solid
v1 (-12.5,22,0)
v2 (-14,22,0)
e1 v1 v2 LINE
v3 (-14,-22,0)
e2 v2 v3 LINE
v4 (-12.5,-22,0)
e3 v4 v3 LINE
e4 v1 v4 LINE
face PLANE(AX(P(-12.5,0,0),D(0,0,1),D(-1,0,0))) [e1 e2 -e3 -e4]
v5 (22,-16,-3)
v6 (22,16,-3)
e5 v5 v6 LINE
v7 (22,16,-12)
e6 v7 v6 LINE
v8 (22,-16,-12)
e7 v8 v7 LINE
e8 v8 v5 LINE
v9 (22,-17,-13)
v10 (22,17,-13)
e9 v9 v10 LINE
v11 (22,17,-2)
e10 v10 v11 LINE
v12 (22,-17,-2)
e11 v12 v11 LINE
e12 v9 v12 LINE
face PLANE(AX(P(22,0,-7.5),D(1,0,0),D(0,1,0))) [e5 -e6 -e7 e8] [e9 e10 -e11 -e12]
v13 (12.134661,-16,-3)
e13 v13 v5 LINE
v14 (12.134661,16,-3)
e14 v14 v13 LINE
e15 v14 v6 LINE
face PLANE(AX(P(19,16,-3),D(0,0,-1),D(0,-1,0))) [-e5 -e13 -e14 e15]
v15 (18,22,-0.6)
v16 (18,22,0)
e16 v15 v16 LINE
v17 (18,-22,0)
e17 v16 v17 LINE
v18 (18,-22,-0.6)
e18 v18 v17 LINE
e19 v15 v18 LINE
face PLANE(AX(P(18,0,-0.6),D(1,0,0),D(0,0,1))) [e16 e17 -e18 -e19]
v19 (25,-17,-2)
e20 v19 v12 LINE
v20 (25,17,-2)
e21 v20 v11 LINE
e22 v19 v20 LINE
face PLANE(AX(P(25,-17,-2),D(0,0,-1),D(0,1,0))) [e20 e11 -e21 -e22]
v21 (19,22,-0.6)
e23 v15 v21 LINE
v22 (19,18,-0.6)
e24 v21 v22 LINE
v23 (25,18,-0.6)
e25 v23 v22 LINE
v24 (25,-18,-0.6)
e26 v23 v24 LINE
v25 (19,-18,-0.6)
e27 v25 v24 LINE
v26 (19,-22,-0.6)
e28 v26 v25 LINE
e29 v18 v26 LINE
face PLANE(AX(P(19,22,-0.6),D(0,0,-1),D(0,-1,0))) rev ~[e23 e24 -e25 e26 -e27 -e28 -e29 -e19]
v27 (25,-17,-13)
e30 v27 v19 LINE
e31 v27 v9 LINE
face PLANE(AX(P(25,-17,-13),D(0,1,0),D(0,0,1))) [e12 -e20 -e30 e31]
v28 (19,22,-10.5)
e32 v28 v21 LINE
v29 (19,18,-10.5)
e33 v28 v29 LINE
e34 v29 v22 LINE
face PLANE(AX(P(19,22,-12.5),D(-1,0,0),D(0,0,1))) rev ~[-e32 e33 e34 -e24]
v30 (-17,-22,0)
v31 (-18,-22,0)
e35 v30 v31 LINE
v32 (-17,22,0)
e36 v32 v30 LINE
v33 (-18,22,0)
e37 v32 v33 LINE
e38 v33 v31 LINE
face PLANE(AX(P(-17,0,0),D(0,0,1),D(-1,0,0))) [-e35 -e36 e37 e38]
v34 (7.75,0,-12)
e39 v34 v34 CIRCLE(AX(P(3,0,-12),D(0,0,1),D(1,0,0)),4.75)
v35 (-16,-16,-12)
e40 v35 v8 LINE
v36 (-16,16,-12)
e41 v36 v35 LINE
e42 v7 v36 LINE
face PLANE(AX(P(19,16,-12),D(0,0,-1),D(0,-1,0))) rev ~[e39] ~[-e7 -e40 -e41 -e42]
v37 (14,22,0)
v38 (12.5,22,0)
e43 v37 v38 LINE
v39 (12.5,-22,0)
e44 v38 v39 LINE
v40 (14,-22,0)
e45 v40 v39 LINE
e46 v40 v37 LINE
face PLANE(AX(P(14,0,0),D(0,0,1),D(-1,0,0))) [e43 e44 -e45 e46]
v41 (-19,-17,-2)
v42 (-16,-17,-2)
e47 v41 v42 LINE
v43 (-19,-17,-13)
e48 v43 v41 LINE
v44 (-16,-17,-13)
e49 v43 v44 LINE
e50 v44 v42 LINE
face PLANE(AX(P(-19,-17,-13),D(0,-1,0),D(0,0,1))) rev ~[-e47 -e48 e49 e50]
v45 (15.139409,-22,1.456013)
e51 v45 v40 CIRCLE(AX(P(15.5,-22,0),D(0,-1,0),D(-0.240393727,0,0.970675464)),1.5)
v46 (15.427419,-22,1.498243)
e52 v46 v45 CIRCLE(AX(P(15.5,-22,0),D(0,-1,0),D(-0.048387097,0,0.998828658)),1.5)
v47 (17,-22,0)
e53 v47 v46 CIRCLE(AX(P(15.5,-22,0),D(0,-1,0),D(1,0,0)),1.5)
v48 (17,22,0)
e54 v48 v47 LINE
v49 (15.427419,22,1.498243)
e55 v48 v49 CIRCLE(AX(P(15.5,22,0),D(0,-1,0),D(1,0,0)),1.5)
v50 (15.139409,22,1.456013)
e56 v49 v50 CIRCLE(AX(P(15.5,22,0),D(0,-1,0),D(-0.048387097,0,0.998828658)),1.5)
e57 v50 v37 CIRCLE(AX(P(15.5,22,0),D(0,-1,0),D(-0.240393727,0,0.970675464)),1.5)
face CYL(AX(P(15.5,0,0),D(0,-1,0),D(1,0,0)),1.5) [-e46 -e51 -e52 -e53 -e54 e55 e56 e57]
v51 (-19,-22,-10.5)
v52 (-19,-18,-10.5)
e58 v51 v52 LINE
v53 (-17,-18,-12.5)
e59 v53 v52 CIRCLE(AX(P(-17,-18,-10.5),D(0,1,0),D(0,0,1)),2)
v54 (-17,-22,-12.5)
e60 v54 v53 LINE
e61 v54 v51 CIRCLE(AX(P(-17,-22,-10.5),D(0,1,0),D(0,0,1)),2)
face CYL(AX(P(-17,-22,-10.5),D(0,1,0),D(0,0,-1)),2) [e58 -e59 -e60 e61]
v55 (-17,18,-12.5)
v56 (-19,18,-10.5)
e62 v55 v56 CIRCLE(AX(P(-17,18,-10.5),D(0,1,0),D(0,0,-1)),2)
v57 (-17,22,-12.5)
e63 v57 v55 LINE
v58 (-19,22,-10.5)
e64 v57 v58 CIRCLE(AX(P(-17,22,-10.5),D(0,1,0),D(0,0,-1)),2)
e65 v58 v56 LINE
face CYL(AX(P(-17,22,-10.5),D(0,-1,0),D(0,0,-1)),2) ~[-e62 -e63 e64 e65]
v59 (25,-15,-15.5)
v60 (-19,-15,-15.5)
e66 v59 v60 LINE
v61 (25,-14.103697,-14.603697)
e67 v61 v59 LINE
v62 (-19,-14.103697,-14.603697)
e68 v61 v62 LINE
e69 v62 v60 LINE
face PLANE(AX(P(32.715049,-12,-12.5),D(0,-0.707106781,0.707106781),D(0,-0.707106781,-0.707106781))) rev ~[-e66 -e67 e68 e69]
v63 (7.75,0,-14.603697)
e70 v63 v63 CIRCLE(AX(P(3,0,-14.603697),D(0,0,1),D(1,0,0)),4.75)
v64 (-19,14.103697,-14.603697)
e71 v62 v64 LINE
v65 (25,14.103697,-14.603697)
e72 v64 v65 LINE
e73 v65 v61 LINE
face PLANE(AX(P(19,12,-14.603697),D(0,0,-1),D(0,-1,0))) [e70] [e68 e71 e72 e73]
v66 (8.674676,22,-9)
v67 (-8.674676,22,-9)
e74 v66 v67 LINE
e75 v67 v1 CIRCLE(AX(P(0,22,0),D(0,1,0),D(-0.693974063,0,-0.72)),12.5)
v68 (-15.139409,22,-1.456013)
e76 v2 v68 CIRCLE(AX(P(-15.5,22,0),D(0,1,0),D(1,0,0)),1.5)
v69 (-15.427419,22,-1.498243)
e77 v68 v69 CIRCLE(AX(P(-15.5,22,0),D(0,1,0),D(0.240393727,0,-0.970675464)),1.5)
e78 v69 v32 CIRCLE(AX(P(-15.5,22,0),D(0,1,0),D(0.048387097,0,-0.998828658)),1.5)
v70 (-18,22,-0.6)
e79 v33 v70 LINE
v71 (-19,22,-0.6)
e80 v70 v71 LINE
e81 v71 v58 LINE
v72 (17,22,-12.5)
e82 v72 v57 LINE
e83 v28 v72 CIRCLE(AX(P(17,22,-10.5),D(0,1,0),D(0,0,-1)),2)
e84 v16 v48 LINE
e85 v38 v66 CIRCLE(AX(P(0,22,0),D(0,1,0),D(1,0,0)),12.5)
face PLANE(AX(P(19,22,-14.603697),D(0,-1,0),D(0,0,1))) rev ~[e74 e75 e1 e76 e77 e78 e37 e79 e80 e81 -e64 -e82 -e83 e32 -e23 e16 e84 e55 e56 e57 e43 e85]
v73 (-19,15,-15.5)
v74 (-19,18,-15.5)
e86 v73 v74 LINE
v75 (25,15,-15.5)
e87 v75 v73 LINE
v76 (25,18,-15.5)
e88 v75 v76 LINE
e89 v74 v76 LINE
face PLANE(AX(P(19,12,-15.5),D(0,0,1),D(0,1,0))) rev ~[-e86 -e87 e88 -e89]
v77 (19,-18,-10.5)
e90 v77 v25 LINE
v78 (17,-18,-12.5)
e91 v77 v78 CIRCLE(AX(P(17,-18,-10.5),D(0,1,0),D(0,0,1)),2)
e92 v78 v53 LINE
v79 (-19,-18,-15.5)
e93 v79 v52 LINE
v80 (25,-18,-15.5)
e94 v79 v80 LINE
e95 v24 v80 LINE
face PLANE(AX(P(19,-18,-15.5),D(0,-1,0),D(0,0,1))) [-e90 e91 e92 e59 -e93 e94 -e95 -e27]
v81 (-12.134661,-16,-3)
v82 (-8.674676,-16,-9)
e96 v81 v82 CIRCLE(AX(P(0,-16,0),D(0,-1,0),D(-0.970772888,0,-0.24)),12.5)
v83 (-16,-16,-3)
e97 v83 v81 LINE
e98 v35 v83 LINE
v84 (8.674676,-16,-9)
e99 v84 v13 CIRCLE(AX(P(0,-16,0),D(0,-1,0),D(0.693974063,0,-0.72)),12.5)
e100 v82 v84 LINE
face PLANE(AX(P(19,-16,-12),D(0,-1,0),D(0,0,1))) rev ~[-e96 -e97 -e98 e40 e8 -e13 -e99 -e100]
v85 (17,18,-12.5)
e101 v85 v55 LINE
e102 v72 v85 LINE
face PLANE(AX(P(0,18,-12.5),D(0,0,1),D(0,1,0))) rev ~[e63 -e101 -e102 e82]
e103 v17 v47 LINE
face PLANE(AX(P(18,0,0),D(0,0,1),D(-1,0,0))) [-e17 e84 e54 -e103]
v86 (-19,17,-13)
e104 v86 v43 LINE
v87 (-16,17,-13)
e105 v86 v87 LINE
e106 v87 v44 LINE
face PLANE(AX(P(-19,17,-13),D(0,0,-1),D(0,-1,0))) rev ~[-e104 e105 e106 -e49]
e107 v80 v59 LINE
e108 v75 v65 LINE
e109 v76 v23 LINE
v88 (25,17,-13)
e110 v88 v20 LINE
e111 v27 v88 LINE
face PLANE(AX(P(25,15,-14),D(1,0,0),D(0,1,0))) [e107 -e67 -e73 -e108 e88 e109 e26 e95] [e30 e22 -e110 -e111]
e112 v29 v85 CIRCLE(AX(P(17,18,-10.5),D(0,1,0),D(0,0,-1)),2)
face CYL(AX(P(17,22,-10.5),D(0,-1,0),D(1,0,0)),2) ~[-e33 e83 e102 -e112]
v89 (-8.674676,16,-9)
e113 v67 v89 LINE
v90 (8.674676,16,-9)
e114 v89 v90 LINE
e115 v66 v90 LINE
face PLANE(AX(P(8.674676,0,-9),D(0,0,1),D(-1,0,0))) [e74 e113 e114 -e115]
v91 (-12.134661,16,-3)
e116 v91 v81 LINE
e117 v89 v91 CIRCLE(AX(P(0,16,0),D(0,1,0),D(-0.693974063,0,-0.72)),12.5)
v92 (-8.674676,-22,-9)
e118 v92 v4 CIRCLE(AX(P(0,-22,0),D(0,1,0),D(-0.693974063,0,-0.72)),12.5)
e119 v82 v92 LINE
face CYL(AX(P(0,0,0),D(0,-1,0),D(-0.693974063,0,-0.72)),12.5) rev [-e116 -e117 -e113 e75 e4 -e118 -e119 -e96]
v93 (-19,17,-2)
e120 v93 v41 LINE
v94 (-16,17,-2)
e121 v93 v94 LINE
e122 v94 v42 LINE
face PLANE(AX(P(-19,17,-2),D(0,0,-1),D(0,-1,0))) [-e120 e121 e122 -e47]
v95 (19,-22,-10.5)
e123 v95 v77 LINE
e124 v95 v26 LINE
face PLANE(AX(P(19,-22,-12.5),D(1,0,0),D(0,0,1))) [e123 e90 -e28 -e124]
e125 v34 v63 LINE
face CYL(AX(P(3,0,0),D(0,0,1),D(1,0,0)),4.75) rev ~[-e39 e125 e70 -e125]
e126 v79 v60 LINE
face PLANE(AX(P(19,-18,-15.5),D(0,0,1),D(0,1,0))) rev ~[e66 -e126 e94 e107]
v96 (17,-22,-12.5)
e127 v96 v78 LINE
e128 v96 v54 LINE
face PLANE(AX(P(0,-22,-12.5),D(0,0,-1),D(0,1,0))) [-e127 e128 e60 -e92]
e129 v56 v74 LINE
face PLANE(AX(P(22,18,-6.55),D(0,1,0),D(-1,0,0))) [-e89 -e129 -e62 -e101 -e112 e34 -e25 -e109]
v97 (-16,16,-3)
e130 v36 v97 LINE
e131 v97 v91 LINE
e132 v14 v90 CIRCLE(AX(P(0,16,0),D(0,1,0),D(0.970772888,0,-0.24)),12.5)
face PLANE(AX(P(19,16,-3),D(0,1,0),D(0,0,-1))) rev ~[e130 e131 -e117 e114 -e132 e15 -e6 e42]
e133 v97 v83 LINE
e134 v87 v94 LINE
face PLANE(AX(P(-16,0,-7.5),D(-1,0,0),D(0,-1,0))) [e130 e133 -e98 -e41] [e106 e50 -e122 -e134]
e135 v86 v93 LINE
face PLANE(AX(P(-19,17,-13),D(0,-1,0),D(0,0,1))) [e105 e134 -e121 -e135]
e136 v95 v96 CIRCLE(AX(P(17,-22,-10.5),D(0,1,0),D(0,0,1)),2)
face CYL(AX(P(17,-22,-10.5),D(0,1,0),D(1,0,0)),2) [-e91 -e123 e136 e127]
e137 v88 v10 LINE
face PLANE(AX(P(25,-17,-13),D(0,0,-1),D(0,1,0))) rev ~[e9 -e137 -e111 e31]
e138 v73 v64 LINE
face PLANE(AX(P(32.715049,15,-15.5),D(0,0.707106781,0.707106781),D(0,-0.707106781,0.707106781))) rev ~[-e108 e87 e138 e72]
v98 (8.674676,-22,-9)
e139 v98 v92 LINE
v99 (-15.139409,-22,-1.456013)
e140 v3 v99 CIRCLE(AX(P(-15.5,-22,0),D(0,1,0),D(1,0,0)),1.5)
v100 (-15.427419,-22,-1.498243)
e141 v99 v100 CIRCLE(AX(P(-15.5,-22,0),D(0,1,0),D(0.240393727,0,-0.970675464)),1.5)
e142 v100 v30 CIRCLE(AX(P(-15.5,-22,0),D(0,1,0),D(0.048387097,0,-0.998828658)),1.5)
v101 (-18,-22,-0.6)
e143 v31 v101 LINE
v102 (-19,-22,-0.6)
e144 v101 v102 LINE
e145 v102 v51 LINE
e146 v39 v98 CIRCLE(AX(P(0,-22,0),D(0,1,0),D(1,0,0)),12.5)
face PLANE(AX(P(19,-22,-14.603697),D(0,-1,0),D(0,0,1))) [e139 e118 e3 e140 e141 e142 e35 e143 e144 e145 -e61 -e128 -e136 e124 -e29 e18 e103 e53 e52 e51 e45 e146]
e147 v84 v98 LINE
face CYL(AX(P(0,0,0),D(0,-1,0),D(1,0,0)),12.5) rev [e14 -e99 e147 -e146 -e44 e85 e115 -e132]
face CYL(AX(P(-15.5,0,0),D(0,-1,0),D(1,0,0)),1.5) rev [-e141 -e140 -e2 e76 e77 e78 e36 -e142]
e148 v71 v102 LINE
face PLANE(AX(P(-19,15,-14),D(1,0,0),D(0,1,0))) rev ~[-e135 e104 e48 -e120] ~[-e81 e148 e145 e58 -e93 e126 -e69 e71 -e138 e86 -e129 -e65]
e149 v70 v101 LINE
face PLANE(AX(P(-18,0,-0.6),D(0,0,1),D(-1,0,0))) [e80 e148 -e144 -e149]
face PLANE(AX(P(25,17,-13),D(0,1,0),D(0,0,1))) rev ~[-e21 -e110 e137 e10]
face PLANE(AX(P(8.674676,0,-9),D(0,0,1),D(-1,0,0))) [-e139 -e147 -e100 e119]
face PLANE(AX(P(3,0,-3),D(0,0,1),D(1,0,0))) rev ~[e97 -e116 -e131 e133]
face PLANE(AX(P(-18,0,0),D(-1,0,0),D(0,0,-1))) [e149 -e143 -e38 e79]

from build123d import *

# Parameters (mm, degrees)
F3_DEPTH     = 22
F0_R         = 4.75
F4_DEPTH     = 25
F2_W         = 6
F2_H         = 3
F5_DEPTH     = 19
F6_W         = 60
F6_H         = 32
F7_DEPTH     = 3
F8_DEPTH     = 3
F9_DEPTH     = 3
F10_DEPTH    = 3
F11_DEPTH    = 6
F12_W        = 34
F12_H        = 11
F12_W_2      = 32
F12_H_2      = 9
F13_DEPTH    = 3
F14_W        = 34
F14_H        = 11
F14_W_2      = 32
F14_H_2      = 9
F15_DEPTH    = 3
F2_W_2       = 4
F16_DEPTH    = 25
F17_T4_DEPTH = 59.4300979278
F17_T9_DEPTH = 59.4300979278
F18_W        = 6
F18_H        = 11.9
F19_DEPTH    = 4
F20_W        = 6
F20_H        = 11.9
F21_DEPTH    = 4
F22_R        = 2


# Not quite as in the source:
# - a fillet or chamfer that OpenCascade refuses, or shapes differently, is made with other operations: its cross-section is extruded or revolved along the edge and cut away or added


with BuildPart() as f3:
    # F1 (on Front) → F3 (new body, symmetric)
    with BuildSketch(Plane.XZ):
        with BuildLine():
            Line((14, 0), (12.5, 0))
            ThreePointArc((12.5, 0), (11.5039872942, -4.8896090165), (8.6746757864, -9))
            Line((8.6746757864, -9), (12.6194294641, -9))
            ThreePointArc((12.6194294641, -9), (14.1666094691, -6.2894495904), (15.139409409, -3.3238957184))
            Line((15.139409409, -3.3238957184), (15.139409409, -1.4560131956))
            ThreePointArc((15.139409409, -1.4560131956), (14.318711321, -0.9244225531), (14, 0))
        make_face()
        with BuildLine():
            Line((8.6746757864, -9), (3.0413812651, -9))
            ThreePointArc((3.0413812651, -9), (0, -9.5), (-3.0413812651, -9))
            Line((-3.0413812651, -9), (-8.6746757864, -9))
            ThreePointArc((-8.6746757864, -9), (0, -12.5), (8.6746757864, -9))
        make_face()
        with BuildLine():
            ThreePointArc((-3.0413812651, -9), (0, -9.5), (3.0413812651, -9))
            Line((3.0413812651, -9), (-3.0413812651, -9))
        make_face()
        with BuildLine():
            Line((12.6194294641, -9), (8.6746757864, -9))
            ThreePointArc((8.6746757864, -9), (0, -12.5), (-8.6746757864, -9))
            Line((-8.6746757864, -9), (-12.6194294641, -9))
            ThreePointArc((-12.6194294641, -9), (-10.9697184602, -10.9505834047), (-9.0220182155, -12.603697367))
            Line((-9.0220182155, -12.603697367), (9.0220182155, -12.603697367))
            ThreePointArc((9.0220182155, -12.603697367), (10.9697184602, -10.9505834047), (12.6194294641, -9))
        make_face()
        with BuildLine():
            ThreePointArc((15.139409409, 1.4560131956), (14.318711321, 0.9244225531), (14, 0))
            Line((14, 0), (15.139409409, 0))
            Line((15.139409409, 0), (15.139409409, 1.4560131956))
        make_face()
        with BuildLine():
            Line((15.139409409, 0), (14, 0))
            ThreePointArc((14, 0), (14.318711321, -0.9244225531), (15.139409409, -1.4560131956))
            Line((15.139409409, -1.4560131956), (15.139409409, 0))
        make_face()
        with BuildLine():
            ThreePointArc((-8.6746757864, -9), (-11.5039872942, -4.8896090165), (-12.5, 0))
            Line((-12.5, 0), (-14, 0))
            ThreePointArc((-14, 0), (-14.318711321, -0.9244225531), (-15.139409409, -1.4560131956))
            Line((-15.139409409, -1.4560131956), (-15.139409409, -3.3238957184))
            ThreePointArc((-15.139409409, -3.3238957184), (-14.1666094691, -6.2894495904), (-12.6194294641, -9))
            Line((-12.6194294641, -9), (-8.6746757864, -9))
        make_face()
        with BuildLine():
            ThreePointArc((15.139409409, -3.3238957184), (14.1666094691, -6.2894495904), (12.6194294641, -9))
            Line((12.6194294641, -9), (15.139409409, -9))
            Line((15.139409409, -9), (15.139409409, -3.3238957184))
        make_face()
        with BuildLine():
            Line((15.139409409, -9), (12.6194294641, -9))
            ThreePointArc((12.6194294641, -9), (10.9697184602, -10.9505834047), (9.0220182155, -12.603697367))
            Line((9.0220182155, -12.603697367), (14.2178343175, -12.603697367))
            ThreePointArc((14.2178343175, -12.603697367), (15.5800609184, -10.8748196205), (16.7332005307, -9))
            Line((16.7332005307, -9), (15.139409409, -9))
        make_face()
        with BuildLine():
            Line((15.5, 0), (15.139409409, 0))
            Line((15.139409409, 0), (15.139409409, -1.4560131956))
            ThreePointArc((15.139409409, -1.4560131956), (15.2823875721, -1.484131002), (15.4274193548, -1.4982429876))
            ThreePointArc((15.4274193548, -1.4982429876), (15.4818442054, -0.75), (15.5, 0))
        make_face()
        with BuildLine():
            Line((15.139409409, 1.4560131956), (15.139409409, 0))
            Line((15.139409409, 0), (15.5, 0))
            ThreePointArc((15.5, 0), (15.4818442054, 0.75), (15.4274193548, 1.4982429876))
            ThreePointArc((15.4274193548, 1.4982429876), (15.2823875721, 1.484131002), (15.139409409, 1.4560131956))
        make_face()
        with BuildLine():
            ThreePointArc((15.4274193548, -1.4982429876), (15.2823875721, -1.484131002), (15.139409409, -1.4560131956))
            Line((15.139409409, -1.4560131956), (15.139409409, -3.3238957184))
            ThreePointArc((15.139409409, -3.3238957184), (15.3106501215, -2.4153659883), (15.4274193548, -1.4982429876))
        make_face()
        with BuildLine():
            ThreePointArc((-9.0220182155, -12.603697367), (-10.9697184602, -10.9505834047), (-12.6194294641, -9))
            Line((-12.6194294641, -9), (-15.139409409, -9))
            Line((-15.139409409, -9), (-16.7332005307, -9))
            ThreePointArc((-16.7332005307, -9), (-15.5800609184, -10.8748196205), (-14.2178343175, -12.603697367))
            Line((-14.2178343175, -12.603697367), (-9.0220182155, -12.603697367))
        make_face()
        with BuildLine():
            Line((-15.139409409, -9), (-12.6194294641, -9))
            ThreePointArc((-12.6194294641, -9), (-14.1666094691, -6.2894495904), (-15.139409409, -3.3238957184))
            Line((-15.139409409, -3.3238957184), (-15.139409409, -9))
        make_face()
        with BuildLine():
            Line((15.139409409, -3.3238957184), (15.139409409, -9))
            Line((15.139409409, -9), (16.7332005307, -9))
            ThreePointArc((16.7332005307, -9), (18.3490087673, -4.9309103884), (18.9905239528, -0.6))
            Line((18.9905239528, -0.6), (18, -0.6))
            Line((18, -0.6), (18, 0))
            Line((18, 0), (17, 0))
            ThreePointArc((17, 0), (16.5346808765, -1.0860181784), (15.4274193548, -1.4982429876))
            ThreePointArc((15.4274193548, -1.4982429876), (15.3106501215, -2.4153659883), (15.139409409, -3.3238957184))
        make_face()
        with BuildLine():
            ThreePointArc((5.1944223175, -14.603697367), (7.1782167254, -13.7376564465), (9.0220182155, -12.603697367))
            Line((9.0220182155, -12.603697367), (-9.0220182155, -12.603697367))
            ThreePointArc((-9.0220182155, -12.603697367), (-7.1782167254, -13.7376564465), (-5.1944223175, -14.603697367))
            Line((-5.1944223175, -14.603697367), (5.1944223175, -14.603697367))
        make_face()
        with BuildLine():
            Line((14.2178343175, -12.603697367), (9.0220182155, -12.603697367))
            ThreePointArc((9.0220182155, -12.603697367), (7.1782167254, -13.7376564465), (5.1944223175, -14.603697367))
            Line((5.1944223175, -14.603697367), (12.1545062924, -14.603697367))
            ThreePointArc((12.1545062924, -14.603697367), (13.2240344567, -13.6427604497), (14.2178343175, -12.603697367))
        make_face()
        with BuildLine():
            Line((17, 0), (15.5, 0))
            ThreePointArc((15.5, 0), (15.4818442054, -0.75), (15.4274193548, -1.4982429876))
            ThreePointArc((15.4274193548, -1.4982429876), (16.5346808765, -1.0860181784), (17, 0))
        make_face()
        with BuildLine():
            ThreePointArc((15.4274193548, 1.4982429876), (15.4818442054, 0.75), (15.5, 0))
            Line((15.5, 0), (17, 0))
            ThreePointArc((17, 0), (16.5346808765, 1.0860181784), (15.4274193548, 1.4982429876))
        make_face()
        with BuildLine():
            Line((-15.139409409, -3.3238957184), (-15.139409409, -1.4560131956))
            ThreePointArc((-15.139409409, -1.4560131956), (-15.2823875721, -1.484131002), (-15.4274193548, -1.4982429876))
            ThreePointArc((-15.4274193548, -1.4982429876), (-15.3106501215, -2.4153659883), (-15.139409409, -3.3238957184))
        make_face()
        with BuildLine():
            Line((-16.7332005307, -9), (-15.139409409, -9))
            Line((-15.139409409, -9), (-15.139409409, -3.3238957184))
            ThreePointArc((-15.139409409, -3.3238957184), (-15.3106501215, -2.4153659883), (-15.4274193548, -1.4982429876))
            ThreePointArc((-15.4274193548, -1.4982429876), (-16.5346808765, -1.0860181784), (-17, 0))
            Line((-17, 0), (-18, 0))
            Line((-18, 0), (-18, -0.6))
            Line((-18, -0.6), (-18.9905239528, -0.6))
            ThreePointArc((-18.9905239528, -0.6), (-18.3490087673, -4.9309103884), (-16.7332005307, -9))
        make_face()
        with BuildLine():
            ThreePointArc((-5.1944223175, -14.603697367), (-7.1782167254, -13.7376564465), (-9.0220182155, -12.603697367))
            Line((-9.0220182155, -12.603697367), (-14.2178343175, -12.603697367))
            ThreePointArc((-14.2178343175, -12.603697367), (-13.2240344567, -13.6427604497), (-12.1545062924, -14.603697367))
            Line((-12.1545062924, -14.603697367), (-5.1944223175, -14.603697367))
        make_face()
        with BuildLine():
            ThreePointArc((18.9905239528, -0.6), (18.3490087673, -4.9309103884), (16.7332005307, -9))
            Line((16.7332005307, -9), (19, -9))
            Line((19, -9), (19, -0.6))
            Line((19, -0.6), (18.9905239528, -0.6))
        make_face()
        with BuildLine():
            Line((19, -9), (16.7332005307, -9))
            ThreePointArc((16.7332005307, -9), (15.5800609184, -10.8748196205), (14.2178343175, -12.603697367))
            Line((14.2178343175, -12.603697367), (19, -12.603697367))
            Line((19, -12.603697367), (19, -9))
        make_face()
        with BuildLine():
            Line((19, -12.603697367), (14.2178343175, -12.603697367))
            ThreePointArc((14.2178343175, -12.603697367), (13.2240344567, -13.6427604497), (12.1545062924, -14.603697367))
            Line((12.1545062924, -14.603697367), (19, -14.603697367))
            Line((19, -14.603697367), (19, -12.603697367))
        make_face()
        with BuildLine():
            ThreePointArc((-14.2178343175, -12.603697367), (-15.5800609184, -10.8748196205), (-16.7332005307, -9))
            Line((-16.7332005307, -9), (-19, -9))
            Line((-19, -9), (-19, -12.603697367))
            Line((-19, -12.603697367), (-14.2178343175, -12.603697367))
        make_face()
        with BuildLine():
            Line((-19, -9), (-16.7332005307, -9))
            ThreePointArc((-16.7332005307, -9), (-18.3490087673, -4.9309103884), (-18.9905239528, -0.6))
            Line((-18.9905239528, -0.6), (-19, -0.6))
            Line((-19, -0.6), (-19, -9))
        make_face()
        with BuildLine():
            ThreePointArc((-12.1545062924, -14.603697367), (-13.2240344567, -13.6427604497), (-14.2178343175, -12.603697367))
            Line((-14.2178343175, -12.603697367), (-19, -12.603697367))
            Line((-19, -12.603697367), (-19, -14.603697367))
            Line((-19, -14.603697367), (-12.1545062924, -14.603697367))
        make_face()
    extrude(amount=F3_DEPTH, both=True)

    # F0 (on Top) → F4 (cut)
    with BuildSketch(Plane.XY):
        with Locations((3, 0)):
            Circle(F0_R)
    extrude(amount=-F4_DEPTH, mode=Mode.SUBTRACT)

    # F2 (on Right) → F5 (join, symmetric)
    with BuildSketch(Plane.YZ):
        with Locations((-15, -14)):
            Rectangle(F2_W, F2_H)
        with Locations((15, -14)):
            Rectangle(F2_W, F2_H)
    extrude(amount=F5_DEPTH, both=True)

    # F6 (on face) → F7 (cut)
    with BuildSketch(Plane.XY.offset(-9)):
        with Locations((3, 0)):
            Rectangle(F6_W, F6_H)
    extrude(amount=-F7_DEPTH, mode=Mode.SUBTRACT)

    # F6 (on face) → F8 (cut)
    with BuildSketch(Plane.XY.offset(-9)):
        with Locations((3, 0)):
            Rectangle(F6_W, F6_H)
    extrude(amount=F8_DEPTH, mode=Mode.SUBTRACT)

    # F9 (cut): a face of the model
    f9_faces = [f3.faces().sort_by_distance(p)[0] for p in [
        (-14.9829280499, 0, -6),
    ]]
    extrude(f9_faces, amount=-F9_DEPTH, mode=Mode.SUBTRACT)

    # F10 (cut): a face of the model
    f10_faces = [f3.faces().sort_by_distance(p)[0] for p in [
        (14.9829280499, 0, -6),
    ]]
    extrude(f10_faces, amount=-F10_DEPTH, mode=Mode.SUBTRACT)

    # F11 (add): a face of the model
    f11_faces = [f3.faces().sort_by_distance(p)[0] for p in [
        (19, 20, -14.1391535047),
    ]]
    extrude(f11_faces, amount=F11_DEPTH)

    # F12 (on face) → F13 (cut)
    with BuildSketch(Plane.YZ.offset(25)):
        with Locations((0, -7.5)):
            Rectangle(F12_W, F12_H)
        with Locations((0, -7.5)):
            Rectangle(F12_W_2, F12_H_2, mode=Mode.SUBTRACT)
    extrude(amount=-F13_DEPTH, mode=Mode.SUBTRACT)

    # F14 (on face) → F15 (cut)
    with BuildSketch(Plane(origin=(-19, 0, 0), x_dir=(0, -1, 0), z_dir=(-1, 0, 0))):
        with Locations((0, -7.5)):
            Rectangle(F14_W, F14_H)
        with Locations((0, -7.5)):
            Rectangle(F14_W_2, F14_H_2, mode=Mode.SUBTRACT)
    extrude(amount=-F15_DEPTH, mode=Mode.SUBTRACT)

    # F2 (on Right) → F16 (cut, symmetric)
    with BuildSketch(Plane.YZ):
        with Locations((20, -14)):
            Rectangle(F2_W_2, F2_H)
        with Locations((-20, -14)):
            Rectangle(F2_W_2, F2_H)
    extrude(amount=F16_DEPTH, both=True, mode=Mode.SUBTRACT)

    # F17: chamfer of 3 on 2 edges, made by hand


with BuildPart() as f17_tool2:
    # F17_s3 → F17_t4 (new body)
    with BuildSketch(Plane.YZ.offset(32.7150489639)):
        Polygon((15, -15.5), (12, -12.5), (12, -15.5), align=None)
    extrude(amount=-F17_T4_DEPTH)

    split(bisect_by=Plane.XY.offset(-14.603697367), keep=Keep.BOTTOM)


with BuildPart() as f3_1:
    add(f3.part)

    # F17_t1: cut F17_tool2
    add(f17_tool2.part, mode=Mode.SUBTRACT)


with BuildPart() as f17_tool7:
    # F17_s8 → F17_t9 (new body)
    with BuildSketch(Plane.YZ.offset(32.7150489639)):
        Polygon((-12, -12.5), (-15, -15.5), (-12, -15.5), align=None)
    extrude(amount=-F17_T9_DEPTH)

    split(bisect_by=Plane.XY.offset(-14.603697367), keep=Keep.BOTTOM)


with BuildPart() as f3_2:
    add(f3_1.part)

    # F17_t6: cut F17_tool7
    add(f17_tool7.part, mode=Mode.SUBTRACT)

    # F18 (on face) → F19 (cut)
    with BuildSketch(Plane.XZ.offset(22)):
        with Locations((22, -6.55)):
            Rectangle(F18_W, F18_H)
    extrude(amount=-F19_DEPTH, mode=Mode.SUBTRACT)

    # F20 (on face) → F21 (cut)
    with BuildSketch(Plane(origin=(0, 22, 0), x_dir=(-1, 0, 0), z_dir=(0, 1, 0))):
        with Locations((-22, -6.55)):
            Rectangle(F20_W, F20_H)
    extrude(amount=-F21_DEPTH, mode=Mode.SUBTRACT)

    # F22
    f22_edges = [f3_2.edges().sort_by_distance(p)[0] for p in [
        (-19, 20, -12.5),
        (19, -20, -12.5),
        (19, 20, -12.5),
        (-19, -20, -12.5),
    ]]
    fillet(f22_edges, radius=F22_R)


solid = f3_2.part
